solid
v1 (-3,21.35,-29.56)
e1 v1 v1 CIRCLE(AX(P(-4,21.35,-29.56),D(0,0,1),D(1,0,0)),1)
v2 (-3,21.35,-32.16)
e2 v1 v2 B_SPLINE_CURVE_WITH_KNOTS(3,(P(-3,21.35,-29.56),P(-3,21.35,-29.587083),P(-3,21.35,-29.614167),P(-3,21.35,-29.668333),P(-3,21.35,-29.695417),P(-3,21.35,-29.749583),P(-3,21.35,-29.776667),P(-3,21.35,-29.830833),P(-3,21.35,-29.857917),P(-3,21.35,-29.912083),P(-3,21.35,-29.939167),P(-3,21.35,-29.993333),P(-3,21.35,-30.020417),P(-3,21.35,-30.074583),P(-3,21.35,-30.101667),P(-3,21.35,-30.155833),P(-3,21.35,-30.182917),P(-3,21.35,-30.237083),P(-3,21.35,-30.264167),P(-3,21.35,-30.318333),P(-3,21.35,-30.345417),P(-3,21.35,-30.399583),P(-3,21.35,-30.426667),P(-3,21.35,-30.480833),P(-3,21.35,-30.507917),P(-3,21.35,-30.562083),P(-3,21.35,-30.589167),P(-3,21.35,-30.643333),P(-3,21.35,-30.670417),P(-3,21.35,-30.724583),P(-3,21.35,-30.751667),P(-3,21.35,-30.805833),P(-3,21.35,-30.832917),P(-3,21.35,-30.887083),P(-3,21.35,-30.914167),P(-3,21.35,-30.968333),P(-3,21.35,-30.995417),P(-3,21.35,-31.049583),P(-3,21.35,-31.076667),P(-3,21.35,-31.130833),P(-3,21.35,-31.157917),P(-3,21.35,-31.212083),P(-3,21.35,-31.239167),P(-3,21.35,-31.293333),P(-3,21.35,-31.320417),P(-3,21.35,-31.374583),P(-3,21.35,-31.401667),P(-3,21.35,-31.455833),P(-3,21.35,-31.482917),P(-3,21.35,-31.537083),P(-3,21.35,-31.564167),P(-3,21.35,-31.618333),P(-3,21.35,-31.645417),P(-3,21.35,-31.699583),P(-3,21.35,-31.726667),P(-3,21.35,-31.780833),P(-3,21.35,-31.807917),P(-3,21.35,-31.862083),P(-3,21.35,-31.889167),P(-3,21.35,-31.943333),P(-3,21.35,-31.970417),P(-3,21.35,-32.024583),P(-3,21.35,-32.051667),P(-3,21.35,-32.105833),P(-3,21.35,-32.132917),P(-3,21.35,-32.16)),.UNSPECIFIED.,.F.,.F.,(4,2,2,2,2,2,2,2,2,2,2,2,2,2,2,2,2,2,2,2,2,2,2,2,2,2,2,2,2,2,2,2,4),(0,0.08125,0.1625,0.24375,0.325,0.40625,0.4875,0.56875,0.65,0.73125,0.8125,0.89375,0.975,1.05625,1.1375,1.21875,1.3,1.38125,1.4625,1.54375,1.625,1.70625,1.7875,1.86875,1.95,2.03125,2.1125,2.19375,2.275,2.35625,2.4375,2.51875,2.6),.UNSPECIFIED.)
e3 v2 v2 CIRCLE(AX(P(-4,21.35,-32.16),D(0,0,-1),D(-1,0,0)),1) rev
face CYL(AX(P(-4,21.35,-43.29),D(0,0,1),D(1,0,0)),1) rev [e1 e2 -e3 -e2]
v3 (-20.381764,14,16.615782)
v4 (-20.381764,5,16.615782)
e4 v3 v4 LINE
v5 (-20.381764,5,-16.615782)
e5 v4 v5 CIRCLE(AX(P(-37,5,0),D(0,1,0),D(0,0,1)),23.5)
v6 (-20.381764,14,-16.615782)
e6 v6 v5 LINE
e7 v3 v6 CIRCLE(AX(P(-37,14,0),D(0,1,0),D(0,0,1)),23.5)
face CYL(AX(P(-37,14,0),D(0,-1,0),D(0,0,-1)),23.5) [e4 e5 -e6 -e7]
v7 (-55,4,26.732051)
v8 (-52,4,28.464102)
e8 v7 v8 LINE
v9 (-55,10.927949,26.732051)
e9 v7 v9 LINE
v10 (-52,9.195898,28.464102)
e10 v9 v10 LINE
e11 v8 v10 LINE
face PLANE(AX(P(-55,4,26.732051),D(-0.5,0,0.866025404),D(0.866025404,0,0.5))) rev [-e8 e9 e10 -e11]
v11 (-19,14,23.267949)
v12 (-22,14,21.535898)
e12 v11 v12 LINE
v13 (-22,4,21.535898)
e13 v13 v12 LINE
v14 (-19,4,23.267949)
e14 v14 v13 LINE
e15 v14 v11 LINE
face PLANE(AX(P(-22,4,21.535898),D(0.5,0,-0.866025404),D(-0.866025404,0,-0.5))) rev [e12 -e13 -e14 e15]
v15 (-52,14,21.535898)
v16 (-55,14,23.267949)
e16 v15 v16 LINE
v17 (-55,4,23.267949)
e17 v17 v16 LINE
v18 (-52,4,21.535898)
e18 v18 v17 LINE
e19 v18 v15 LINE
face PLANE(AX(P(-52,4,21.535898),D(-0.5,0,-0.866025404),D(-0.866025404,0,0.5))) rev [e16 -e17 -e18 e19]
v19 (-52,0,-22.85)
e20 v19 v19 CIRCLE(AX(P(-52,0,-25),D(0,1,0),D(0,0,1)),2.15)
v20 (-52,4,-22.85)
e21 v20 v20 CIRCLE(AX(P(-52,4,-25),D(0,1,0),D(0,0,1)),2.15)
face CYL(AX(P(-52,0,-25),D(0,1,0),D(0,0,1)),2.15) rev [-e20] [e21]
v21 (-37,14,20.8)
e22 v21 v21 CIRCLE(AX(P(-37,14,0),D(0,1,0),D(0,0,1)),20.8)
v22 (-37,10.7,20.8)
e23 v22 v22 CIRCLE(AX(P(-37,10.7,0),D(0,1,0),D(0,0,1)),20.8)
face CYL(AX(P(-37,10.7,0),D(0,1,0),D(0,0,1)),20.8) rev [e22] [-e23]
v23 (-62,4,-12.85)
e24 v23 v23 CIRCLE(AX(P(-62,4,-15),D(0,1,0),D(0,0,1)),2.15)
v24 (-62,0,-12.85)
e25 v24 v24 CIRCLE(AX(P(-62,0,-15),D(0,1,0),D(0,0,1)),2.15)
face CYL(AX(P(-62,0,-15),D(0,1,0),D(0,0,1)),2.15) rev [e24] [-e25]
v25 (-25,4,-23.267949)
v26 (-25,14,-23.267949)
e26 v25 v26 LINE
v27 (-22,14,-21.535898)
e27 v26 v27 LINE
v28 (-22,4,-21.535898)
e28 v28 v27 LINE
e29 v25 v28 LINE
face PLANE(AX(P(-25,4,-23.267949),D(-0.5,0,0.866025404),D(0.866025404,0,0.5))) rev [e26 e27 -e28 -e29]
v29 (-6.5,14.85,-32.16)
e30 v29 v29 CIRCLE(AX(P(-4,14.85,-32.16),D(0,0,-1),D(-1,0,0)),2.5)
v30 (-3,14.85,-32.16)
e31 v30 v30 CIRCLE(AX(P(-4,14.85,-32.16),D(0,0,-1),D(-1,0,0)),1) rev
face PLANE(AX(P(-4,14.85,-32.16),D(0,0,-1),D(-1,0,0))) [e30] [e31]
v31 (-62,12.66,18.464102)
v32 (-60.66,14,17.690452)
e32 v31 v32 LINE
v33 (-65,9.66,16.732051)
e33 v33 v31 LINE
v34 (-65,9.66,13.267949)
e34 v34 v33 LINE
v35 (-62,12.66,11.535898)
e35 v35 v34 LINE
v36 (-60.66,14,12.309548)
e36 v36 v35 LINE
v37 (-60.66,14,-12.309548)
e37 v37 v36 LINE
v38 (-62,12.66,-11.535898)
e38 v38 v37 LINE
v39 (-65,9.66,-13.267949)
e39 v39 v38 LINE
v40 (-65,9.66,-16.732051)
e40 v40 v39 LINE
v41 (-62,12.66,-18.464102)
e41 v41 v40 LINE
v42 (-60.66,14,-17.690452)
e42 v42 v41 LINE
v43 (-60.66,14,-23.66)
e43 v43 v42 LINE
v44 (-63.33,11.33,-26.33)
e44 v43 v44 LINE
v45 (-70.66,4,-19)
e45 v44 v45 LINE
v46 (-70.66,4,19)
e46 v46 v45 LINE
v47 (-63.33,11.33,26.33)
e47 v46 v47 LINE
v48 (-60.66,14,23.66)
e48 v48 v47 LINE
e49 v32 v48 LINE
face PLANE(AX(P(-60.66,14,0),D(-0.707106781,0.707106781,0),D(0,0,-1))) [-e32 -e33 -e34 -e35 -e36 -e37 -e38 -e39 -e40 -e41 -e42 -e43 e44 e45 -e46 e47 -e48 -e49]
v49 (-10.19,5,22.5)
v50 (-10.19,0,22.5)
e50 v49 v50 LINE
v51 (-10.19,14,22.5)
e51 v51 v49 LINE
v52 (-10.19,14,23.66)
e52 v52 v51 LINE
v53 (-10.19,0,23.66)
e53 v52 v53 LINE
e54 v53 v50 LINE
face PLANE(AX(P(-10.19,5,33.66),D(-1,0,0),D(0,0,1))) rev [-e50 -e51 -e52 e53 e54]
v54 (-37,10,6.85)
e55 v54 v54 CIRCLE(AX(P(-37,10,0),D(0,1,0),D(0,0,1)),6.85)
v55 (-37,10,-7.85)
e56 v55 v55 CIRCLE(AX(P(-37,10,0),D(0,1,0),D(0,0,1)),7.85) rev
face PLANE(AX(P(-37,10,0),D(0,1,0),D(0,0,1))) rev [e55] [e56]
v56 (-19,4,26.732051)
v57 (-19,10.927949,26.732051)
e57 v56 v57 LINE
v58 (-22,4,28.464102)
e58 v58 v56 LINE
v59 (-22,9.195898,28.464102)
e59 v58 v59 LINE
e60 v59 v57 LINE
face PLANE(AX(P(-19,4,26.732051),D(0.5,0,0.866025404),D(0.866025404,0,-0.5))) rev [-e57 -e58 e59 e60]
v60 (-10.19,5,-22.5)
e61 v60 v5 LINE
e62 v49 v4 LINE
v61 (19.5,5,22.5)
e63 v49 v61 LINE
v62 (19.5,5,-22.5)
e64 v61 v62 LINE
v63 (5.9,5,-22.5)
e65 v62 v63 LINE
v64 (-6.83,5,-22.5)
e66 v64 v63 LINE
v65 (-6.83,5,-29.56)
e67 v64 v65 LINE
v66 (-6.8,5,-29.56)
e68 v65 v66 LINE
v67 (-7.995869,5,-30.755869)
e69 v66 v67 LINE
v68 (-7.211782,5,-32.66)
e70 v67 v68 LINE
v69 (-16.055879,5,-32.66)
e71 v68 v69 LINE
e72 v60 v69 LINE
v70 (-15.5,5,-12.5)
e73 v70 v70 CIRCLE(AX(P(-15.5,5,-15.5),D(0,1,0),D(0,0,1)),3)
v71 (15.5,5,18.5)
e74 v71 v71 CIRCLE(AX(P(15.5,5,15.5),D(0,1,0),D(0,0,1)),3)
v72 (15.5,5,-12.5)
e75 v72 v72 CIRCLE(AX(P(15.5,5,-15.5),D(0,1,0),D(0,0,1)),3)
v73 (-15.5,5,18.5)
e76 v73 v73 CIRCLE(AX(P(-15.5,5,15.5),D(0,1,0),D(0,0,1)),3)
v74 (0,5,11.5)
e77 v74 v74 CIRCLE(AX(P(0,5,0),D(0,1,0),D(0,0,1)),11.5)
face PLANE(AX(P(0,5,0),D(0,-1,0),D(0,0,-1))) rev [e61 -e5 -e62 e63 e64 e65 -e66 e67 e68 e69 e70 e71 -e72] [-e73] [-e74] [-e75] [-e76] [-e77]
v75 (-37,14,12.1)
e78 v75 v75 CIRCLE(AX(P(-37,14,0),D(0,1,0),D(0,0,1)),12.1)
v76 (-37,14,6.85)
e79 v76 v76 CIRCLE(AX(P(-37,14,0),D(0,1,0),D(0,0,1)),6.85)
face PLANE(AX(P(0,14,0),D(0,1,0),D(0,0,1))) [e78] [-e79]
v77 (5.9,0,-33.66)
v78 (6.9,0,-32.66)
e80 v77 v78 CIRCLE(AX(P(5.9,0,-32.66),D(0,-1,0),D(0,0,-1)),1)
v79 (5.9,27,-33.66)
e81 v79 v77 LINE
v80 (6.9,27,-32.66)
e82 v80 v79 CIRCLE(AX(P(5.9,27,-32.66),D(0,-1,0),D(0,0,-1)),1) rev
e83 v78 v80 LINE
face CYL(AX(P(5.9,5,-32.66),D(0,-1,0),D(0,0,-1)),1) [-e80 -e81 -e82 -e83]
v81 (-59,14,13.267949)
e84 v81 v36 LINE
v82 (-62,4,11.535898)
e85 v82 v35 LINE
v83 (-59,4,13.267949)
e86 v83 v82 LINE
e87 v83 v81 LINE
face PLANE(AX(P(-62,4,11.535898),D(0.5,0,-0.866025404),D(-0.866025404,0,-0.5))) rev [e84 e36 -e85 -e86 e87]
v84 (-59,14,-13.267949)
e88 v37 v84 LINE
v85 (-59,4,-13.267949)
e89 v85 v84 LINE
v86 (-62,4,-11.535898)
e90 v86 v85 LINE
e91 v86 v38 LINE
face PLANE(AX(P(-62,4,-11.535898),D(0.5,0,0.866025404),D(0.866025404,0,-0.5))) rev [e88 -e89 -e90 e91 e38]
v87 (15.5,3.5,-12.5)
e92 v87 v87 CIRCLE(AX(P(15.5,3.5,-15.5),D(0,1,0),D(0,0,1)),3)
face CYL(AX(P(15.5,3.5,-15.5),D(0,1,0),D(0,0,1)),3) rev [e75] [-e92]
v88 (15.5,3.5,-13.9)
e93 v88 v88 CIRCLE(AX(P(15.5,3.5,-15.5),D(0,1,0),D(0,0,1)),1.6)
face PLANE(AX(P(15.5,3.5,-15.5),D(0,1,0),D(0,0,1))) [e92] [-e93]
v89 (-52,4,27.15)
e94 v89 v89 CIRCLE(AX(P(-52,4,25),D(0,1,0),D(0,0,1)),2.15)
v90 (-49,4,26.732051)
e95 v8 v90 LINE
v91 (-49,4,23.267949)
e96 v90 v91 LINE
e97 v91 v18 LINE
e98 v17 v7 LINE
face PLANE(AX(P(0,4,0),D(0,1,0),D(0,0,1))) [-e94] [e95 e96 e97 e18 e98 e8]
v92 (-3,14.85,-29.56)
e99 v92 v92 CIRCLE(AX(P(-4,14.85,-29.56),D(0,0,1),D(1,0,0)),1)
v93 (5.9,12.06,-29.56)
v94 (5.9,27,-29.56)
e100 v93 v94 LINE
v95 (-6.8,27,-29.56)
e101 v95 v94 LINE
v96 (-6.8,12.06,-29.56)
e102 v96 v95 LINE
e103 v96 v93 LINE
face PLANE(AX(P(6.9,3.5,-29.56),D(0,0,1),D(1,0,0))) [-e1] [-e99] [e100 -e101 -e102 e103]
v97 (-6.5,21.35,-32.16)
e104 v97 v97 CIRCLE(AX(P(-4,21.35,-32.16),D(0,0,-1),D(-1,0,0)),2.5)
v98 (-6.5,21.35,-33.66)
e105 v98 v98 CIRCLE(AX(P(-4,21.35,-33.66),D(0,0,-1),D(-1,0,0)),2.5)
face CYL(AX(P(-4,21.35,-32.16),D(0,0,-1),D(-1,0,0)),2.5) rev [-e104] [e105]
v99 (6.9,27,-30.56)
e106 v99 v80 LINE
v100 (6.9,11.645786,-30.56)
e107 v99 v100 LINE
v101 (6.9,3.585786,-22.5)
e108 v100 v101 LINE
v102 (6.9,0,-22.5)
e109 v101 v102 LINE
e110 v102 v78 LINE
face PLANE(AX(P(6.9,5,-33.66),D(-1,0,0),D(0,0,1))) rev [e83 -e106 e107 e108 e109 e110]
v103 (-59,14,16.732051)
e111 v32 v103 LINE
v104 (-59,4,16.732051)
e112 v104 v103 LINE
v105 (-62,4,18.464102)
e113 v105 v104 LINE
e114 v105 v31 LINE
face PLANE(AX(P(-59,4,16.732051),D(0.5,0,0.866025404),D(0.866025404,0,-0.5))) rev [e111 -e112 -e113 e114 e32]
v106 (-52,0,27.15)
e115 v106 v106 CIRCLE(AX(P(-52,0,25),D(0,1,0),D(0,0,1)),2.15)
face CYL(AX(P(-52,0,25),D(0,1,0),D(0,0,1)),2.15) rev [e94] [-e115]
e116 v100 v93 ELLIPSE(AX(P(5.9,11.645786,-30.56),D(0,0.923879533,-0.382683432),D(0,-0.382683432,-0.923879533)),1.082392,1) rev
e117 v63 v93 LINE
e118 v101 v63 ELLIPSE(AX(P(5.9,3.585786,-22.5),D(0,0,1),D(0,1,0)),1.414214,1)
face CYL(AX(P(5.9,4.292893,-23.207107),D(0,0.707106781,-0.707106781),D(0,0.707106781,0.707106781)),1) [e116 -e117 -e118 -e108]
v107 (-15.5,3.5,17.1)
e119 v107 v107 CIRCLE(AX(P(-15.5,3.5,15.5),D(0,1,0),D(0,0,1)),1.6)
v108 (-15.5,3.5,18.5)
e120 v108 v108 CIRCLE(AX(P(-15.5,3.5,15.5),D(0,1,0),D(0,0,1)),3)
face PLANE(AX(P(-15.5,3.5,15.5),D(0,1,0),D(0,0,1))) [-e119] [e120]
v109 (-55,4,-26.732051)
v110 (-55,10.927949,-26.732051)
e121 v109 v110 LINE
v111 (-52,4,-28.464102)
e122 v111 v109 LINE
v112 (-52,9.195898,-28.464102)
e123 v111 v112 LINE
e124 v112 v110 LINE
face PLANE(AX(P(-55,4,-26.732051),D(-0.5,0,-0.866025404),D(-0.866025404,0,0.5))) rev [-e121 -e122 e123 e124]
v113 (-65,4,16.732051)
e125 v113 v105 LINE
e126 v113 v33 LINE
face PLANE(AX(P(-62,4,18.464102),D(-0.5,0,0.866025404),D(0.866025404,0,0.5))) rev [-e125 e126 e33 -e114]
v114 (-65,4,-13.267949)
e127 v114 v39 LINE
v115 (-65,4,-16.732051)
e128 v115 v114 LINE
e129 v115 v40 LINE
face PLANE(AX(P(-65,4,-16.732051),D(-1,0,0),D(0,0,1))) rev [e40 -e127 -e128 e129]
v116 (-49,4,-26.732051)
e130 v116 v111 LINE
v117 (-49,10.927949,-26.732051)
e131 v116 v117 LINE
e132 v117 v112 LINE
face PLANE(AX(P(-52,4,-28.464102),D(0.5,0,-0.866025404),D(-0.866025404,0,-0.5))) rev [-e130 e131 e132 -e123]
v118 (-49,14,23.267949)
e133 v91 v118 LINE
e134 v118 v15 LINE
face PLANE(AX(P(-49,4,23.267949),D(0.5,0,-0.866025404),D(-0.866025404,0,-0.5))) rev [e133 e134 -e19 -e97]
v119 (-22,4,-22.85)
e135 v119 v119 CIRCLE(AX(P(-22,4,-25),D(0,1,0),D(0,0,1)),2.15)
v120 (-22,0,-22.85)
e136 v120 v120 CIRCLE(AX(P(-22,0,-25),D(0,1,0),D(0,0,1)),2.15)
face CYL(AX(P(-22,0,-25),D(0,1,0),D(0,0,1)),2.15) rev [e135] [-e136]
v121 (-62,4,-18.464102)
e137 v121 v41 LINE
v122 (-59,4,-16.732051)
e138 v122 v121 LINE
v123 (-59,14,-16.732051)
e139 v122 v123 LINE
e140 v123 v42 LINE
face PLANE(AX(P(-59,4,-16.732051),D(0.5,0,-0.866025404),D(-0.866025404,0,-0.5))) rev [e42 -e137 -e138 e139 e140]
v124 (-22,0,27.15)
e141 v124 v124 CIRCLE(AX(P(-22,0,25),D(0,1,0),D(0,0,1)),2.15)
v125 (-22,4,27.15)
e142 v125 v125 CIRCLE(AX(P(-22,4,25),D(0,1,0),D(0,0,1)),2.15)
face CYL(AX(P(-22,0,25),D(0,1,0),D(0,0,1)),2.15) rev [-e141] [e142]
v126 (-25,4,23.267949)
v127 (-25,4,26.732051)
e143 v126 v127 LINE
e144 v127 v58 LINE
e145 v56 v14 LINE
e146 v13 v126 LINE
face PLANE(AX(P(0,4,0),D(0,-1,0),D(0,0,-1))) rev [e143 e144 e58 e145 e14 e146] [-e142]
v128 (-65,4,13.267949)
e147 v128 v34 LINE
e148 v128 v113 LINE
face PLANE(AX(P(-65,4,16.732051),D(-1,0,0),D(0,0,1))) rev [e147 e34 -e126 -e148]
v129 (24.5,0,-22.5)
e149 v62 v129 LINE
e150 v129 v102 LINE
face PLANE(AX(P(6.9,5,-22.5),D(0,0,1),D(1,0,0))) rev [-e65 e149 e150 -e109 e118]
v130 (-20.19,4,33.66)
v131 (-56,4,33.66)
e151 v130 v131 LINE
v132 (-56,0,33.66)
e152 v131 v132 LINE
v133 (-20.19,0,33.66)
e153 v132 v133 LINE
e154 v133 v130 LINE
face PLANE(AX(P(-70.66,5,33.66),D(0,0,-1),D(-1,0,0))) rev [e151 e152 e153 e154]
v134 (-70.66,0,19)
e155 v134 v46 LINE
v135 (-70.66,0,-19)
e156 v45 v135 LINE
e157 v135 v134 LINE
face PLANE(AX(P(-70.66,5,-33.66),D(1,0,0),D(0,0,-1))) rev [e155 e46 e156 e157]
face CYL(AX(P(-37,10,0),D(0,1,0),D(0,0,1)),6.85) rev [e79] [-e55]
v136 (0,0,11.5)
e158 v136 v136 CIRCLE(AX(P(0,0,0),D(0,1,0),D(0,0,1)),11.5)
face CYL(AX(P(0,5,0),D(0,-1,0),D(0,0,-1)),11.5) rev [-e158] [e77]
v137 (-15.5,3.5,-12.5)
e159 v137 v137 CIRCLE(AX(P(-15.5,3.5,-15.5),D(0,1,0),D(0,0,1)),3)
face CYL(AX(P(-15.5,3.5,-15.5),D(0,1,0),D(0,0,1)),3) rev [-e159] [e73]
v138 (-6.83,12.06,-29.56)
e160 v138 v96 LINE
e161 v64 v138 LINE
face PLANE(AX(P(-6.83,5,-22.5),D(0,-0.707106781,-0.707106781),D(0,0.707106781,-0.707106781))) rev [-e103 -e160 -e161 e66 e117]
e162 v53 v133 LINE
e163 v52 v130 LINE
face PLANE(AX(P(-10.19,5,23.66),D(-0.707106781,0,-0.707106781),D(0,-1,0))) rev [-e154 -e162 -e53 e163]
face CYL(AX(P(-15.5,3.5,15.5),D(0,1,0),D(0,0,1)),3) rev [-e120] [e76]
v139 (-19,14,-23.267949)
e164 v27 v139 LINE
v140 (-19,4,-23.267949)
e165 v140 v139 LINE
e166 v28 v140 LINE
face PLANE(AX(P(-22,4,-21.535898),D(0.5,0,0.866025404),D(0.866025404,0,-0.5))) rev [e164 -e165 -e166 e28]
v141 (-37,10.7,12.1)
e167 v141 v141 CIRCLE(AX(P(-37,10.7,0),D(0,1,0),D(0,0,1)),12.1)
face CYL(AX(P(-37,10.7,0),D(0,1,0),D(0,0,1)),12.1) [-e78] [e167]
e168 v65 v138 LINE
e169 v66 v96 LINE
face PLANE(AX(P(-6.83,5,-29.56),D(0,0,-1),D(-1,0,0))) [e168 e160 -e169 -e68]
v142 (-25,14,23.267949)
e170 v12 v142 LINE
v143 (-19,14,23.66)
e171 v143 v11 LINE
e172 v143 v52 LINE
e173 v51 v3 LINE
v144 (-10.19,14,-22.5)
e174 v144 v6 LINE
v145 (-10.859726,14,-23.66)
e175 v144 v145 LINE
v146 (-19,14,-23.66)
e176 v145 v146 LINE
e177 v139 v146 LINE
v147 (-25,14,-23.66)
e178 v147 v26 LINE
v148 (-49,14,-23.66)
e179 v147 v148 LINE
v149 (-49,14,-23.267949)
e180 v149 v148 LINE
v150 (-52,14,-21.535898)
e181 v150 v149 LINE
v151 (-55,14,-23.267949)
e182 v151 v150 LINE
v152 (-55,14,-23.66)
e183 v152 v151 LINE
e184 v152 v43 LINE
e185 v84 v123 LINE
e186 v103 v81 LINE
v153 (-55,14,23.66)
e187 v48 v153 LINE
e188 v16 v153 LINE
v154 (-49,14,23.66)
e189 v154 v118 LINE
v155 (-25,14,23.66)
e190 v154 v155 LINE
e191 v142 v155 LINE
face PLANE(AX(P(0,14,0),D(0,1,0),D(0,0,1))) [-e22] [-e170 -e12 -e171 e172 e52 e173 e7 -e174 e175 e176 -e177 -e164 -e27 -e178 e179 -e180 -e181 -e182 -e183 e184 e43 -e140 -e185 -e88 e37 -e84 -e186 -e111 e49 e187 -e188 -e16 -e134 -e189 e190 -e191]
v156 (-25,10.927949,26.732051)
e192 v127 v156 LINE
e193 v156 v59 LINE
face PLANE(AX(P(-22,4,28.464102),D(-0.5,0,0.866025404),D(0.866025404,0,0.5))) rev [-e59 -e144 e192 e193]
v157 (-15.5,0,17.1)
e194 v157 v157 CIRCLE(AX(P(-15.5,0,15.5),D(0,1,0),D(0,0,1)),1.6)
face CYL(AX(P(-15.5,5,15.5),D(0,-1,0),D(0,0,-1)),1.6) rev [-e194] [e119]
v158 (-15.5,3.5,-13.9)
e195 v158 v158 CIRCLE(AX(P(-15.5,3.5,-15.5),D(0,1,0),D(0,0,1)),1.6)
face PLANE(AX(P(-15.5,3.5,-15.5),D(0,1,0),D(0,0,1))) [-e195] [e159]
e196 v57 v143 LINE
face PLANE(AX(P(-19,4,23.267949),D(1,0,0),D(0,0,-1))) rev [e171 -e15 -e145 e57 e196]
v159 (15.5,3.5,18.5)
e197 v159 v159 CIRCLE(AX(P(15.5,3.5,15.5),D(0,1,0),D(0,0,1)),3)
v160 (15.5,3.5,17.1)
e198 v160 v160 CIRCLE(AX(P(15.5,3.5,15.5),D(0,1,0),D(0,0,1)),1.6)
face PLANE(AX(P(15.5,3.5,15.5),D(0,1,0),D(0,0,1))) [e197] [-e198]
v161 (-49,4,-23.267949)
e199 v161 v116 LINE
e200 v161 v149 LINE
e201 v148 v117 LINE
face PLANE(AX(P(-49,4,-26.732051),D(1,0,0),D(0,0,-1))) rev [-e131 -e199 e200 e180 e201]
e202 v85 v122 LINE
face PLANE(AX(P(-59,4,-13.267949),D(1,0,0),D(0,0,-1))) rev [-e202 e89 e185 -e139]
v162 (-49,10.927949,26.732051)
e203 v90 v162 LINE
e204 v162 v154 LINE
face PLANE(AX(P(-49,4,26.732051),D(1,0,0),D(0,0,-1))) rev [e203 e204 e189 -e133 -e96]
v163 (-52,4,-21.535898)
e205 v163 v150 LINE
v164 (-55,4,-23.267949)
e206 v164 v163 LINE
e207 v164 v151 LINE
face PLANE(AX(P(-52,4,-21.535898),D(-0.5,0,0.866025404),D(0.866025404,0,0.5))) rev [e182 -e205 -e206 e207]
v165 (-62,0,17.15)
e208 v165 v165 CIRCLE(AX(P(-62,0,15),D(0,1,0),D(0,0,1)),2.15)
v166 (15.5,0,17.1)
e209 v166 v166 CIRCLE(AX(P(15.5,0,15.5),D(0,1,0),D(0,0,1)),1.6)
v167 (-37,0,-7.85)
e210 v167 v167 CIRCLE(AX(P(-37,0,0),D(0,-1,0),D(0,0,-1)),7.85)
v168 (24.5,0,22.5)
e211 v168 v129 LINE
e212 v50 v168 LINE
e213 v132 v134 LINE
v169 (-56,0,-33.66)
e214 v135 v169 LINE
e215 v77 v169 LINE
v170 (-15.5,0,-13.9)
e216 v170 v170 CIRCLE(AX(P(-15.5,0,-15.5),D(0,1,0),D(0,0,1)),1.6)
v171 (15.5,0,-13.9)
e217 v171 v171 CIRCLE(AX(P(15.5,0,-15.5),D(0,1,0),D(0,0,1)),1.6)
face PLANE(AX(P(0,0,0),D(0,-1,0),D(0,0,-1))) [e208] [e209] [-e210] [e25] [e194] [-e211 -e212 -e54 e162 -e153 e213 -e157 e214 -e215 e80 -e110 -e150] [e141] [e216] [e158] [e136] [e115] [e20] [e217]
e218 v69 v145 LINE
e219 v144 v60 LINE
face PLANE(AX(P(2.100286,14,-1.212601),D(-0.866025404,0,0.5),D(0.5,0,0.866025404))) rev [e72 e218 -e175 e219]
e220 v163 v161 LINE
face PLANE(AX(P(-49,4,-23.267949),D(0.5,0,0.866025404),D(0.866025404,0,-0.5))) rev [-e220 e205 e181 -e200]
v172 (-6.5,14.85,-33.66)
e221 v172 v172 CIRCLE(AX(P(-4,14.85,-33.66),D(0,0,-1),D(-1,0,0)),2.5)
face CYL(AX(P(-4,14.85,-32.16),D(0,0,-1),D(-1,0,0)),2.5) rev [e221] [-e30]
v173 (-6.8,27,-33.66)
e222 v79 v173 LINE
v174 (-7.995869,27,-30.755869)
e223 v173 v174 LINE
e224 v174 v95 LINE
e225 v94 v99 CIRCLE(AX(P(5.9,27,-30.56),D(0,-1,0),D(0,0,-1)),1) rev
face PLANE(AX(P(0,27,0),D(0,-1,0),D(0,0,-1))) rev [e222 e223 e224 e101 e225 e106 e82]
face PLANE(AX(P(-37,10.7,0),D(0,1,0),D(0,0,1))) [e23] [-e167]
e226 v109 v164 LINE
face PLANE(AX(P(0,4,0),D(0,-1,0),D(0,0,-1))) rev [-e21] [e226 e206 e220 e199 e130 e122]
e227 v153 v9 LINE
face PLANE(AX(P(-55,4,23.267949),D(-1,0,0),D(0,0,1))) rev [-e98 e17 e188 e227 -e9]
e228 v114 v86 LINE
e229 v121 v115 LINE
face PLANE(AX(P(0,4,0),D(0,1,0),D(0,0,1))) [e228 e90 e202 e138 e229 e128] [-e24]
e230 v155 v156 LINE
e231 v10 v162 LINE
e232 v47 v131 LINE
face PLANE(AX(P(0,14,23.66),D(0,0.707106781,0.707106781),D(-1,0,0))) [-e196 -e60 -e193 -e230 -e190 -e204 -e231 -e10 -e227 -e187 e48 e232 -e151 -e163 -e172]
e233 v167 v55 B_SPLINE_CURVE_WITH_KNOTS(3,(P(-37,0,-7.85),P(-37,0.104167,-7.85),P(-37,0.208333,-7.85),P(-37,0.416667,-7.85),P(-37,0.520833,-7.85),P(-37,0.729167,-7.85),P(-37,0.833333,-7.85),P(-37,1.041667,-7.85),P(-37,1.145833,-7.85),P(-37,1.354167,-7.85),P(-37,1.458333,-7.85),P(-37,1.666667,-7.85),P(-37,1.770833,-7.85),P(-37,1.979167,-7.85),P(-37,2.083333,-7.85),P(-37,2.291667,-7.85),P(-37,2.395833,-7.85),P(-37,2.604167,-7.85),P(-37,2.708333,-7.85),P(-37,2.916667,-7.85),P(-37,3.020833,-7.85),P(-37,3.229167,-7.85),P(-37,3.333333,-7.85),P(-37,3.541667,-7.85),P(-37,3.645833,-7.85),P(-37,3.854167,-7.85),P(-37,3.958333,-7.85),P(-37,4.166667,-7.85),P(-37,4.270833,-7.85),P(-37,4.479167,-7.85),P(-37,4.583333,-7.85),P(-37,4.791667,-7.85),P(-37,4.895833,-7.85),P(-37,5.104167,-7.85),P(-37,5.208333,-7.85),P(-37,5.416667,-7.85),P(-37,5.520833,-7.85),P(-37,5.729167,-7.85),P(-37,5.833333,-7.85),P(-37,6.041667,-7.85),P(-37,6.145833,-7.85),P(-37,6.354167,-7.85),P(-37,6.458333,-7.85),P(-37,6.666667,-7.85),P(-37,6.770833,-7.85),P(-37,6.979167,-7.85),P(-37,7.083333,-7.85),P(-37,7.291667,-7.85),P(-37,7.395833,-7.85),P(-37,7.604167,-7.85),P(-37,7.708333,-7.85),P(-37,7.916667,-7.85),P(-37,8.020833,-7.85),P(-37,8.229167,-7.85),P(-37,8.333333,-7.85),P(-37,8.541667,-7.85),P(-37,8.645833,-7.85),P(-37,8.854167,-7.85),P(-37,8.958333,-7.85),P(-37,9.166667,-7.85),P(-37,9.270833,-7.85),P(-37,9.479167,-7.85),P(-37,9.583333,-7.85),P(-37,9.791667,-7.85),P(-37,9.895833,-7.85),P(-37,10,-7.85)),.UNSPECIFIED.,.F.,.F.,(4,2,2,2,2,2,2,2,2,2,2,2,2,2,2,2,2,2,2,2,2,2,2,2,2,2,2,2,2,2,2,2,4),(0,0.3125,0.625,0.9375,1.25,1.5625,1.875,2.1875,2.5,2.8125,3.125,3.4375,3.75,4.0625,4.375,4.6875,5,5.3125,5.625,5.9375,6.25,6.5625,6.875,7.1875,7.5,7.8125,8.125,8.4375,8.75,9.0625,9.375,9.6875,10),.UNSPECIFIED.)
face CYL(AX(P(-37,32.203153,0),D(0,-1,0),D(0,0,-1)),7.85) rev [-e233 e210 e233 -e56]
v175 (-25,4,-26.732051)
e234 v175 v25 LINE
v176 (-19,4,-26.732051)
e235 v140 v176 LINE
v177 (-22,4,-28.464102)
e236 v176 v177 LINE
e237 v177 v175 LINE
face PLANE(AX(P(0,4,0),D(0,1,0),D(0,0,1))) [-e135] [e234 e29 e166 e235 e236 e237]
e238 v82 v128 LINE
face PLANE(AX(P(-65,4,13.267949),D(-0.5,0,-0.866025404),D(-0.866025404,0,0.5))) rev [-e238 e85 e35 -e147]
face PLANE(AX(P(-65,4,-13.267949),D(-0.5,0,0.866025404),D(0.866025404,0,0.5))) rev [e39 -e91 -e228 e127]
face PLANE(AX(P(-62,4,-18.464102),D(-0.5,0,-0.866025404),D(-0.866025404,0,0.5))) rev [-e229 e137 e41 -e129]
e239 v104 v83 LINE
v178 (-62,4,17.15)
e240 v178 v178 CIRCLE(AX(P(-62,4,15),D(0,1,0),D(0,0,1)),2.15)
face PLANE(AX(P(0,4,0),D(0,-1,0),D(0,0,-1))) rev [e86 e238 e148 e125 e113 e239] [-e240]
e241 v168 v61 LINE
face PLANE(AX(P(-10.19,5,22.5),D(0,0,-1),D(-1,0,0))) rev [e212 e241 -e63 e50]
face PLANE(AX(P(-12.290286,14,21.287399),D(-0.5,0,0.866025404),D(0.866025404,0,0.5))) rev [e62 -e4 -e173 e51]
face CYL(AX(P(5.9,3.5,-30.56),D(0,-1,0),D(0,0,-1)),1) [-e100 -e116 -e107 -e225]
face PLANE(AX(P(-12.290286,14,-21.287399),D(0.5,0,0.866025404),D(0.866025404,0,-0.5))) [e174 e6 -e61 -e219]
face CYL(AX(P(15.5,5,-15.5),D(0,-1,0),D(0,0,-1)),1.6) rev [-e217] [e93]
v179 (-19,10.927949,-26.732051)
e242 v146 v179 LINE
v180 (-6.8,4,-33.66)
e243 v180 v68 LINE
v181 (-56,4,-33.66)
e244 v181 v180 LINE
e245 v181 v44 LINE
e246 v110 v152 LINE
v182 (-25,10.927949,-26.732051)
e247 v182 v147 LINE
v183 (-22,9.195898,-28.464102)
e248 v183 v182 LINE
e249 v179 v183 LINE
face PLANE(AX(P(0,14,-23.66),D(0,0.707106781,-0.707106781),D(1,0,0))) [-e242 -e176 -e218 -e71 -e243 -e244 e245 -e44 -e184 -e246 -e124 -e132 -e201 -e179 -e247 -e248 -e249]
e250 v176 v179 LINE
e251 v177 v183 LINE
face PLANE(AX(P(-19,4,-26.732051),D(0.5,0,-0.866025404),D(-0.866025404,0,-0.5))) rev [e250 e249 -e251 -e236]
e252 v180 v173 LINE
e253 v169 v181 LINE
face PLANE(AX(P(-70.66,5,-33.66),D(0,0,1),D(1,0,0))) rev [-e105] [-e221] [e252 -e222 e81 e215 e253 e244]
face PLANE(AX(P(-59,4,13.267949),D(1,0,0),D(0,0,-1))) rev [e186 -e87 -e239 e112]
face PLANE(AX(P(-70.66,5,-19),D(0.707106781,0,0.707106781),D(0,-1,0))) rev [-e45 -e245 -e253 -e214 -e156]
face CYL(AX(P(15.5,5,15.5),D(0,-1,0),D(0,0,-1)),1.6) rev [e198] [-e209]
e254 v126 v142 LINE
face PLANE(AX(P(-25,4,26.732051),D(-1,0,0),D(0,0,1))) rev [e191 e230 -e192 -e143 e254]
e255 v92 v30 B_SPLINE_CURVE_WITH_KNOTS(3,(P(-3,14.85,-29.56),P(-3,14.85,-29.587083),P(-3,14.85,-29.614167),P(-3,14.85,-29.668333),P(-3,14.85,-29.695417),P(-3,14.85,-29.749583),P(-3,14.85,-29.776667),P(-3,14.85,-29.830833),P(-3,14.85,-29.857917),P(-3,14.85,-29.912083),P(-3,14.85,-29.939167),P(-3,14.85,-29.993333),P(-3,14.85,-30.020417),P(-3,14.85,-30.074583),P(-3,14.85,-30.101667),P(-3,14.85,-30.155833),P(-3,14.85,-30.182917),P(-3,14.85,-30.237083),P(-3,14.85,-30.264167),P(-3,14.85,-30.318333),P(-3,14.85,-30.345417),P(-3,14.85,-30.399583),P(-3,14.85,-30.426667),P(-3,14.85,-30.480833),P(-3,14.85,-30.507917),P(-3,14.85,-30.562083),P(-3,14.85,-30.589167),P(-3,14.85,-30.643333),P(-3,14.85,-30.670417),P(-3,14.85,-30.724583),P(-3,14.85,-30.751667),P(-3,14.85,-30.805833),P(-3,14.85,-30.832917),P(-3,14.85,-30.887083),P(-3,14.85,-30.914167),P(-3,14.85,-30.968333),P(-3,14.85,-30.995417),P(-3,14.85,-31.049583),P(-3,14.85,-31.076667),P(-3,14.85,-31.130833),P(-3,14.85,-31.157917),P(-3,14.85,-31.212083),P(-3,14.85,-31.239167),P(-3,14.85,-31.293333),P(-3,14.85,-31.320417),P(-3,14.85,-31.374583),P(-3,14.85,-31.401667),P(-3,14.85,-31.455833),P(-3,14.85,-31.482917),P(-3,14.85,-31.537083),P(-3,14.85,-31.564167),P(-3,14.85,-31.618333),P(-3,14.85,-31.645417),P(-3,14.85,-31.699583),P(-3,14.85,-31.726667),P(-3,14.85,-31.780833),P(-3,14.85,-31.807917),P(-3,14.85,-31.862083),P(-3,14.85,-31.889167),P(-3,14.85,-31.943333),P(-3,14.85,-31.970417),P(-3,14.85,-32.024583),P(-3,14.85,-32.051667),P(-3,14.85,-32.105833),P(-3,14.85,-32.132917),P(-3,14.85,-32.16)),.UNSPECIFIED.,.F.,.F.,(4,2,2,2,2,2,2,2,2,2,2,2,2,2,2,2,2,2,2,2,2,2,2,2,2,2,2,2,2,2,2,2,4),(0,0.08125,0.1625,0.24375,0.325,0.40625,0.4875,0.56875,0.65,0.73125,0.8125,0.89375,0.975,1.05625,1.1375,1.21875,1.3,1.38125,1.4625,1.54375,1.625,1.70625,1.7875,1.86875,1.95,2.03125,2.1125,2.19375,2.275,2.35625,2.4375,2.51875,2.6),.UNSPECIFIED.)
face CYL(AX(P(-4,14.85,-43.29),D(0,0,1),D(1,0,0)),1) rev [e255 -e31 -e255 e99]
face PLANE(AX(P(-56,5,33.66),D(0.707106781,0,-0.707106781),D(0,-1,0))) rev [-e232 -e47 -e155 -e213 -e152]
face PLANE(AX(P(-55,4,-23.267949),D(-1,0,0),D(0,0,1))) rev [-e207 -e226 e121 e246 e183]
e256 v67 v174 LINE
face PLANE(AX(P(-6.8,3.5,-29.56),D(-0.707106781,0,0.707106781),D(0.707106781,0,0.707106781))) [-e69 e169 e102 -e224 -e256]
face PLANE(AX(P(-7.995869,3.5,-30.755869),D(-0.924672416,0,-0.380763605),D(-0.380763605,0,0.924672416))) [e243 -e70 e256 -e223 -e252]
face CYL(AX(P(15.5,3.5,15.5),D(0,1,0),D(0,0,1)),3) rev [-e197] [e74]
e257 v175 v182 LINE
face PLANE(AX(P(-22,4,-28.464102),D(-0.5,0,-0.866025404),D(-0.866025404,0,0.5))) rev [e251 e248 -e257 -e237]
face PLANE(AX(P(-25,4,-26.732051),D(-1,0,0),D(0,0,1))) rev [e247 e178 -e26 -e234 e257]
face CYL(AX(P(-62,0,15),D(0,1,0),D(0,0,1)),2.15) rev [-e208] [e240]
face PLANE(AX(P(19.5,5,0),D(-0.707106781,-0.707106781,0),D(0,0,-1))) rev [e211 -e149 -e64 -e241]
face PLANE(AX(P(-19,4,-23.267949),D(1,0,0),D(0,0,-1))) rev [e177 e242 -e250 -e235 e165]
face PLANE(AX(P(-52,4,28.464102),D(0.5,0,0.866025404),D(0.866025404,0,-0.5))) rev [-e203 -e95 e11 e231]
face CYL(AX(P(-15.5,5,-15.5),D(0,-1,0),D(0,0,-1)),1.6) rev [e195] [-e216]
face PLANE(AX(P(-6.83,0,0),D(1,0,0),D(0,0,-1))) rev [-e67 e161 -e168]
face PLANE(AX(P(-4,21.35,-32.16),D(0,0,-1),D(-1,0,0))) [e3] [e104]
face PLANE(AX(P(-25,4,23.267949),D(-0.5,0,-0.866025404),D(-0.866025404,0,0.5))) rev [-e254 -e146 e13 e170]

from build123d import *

# Parameters (mm, degrees)
SKETCH1_R                = 11.5
SKETCH1_R_2              = 1.6
BOSS_EXTRUDE1_DEPTH      = 5
BOSS_EXTRUDE2_DEPTH      = 9
SKETCH3_R                = 20.8
SKETCH3_R_2              = 12.1
CUT_EXTRUDE1_DEPTH       = 3.3
SKETCH4_R                = 6.85
CUT_EXTRUDE2_DEPTH       = 4
SKETCH5_R                = 7.85
CUT_EXTRUDE3_DEPTH       = 10
CUT_EXTRUDE4_DEPTH       = 10
SKETCH7_R                = 2.15
CUT_EXTRUDE5_DEPTH       = 79.90393653
CHAMFER1_SIZE            = 10
CHAMFER2_SIZE            = 14.66
CHAMFER3_SIZE            = 5
SKETCH8_R                = 3
CUT_EXTRUDE6_DEPTH       = 1.5
BOSS_EXTRUDE3_DEPTH      = 22
BOSS_EXTRUDE3_DEPTH_BACK = 1.5
BOSS_EXTRUDE4_DEPTH      = 13.73
SKETCH12_R               = 1
CUT_EXTRUDE7_DEPTH       = 13.73
SKETCH13_R               = 2.5
CUT_EXTRUDE8_DEPTH       = 1.5
FILLET1_R                = 1


# Some blends are built 0.0001 mm under size
with BuildPart() as part:
    # Sketch1 → Boss-Extrude1 (new body)
    with BuildSketch(Plane(origin=(0, 0, 0), x_dir=(1, 0, 0), z_dir=(0, 1, 0))):
        Polygon((24.5, 22.5), (24.5, -22.5), (-10.19, -22.5), (-10.19, -33.66), (-70.66, -33.66), (-70.66, 33.66), (6.9, 33.66), (6.9, 22.5), align=None)
        with Locations(Location((0, 0, 0), (0, 0, 270))):
            Circle(SKETCH1_R, mode=Mode.SUBTRACT)
        with Locations(Location((15.5, 15.5, 0), (0, 0, 270))):
            Circle(SKETCH1_R_2, mode=Mode.SUBTRACT)
        with Locations(Location((15.5, -15.5, 0), (0, 0, 270))):
            Circle(SKETCH1_R_2, mode=Mode.SUBTRACT)
        with Locations(Location((-15.5, -15.5, 0), (0, 0, 270))):
            Circle(SKETCH1_R_2, mode=Mode.SUBTRACT)
        with Locations(Location((-15.5, 15.5, 0), (0, 0, 270))):
            Circle(SKETCH1_R_2, mode=Mode.SUBTRACT)
    extrude(amount=BOSS_EXTRUDE1_DEPTH)

    # Sketch2 → Boss-Extrude2 (add)
    with BuildSketch(Plane(origin=(0, 5, 0), x_dir=(1, 0, 0), z_dir=(0, 1, 0))):
        with BuildLine():
            Line((-10.19, -33.66), (-10.19, -22.5))
            Line((-10.19, -22.5), (-20.381763801, -16.615782426))
            ThreePointArc((-20.381763801, -16.615782426), (-45.992259152, -21.711500992), (-60.5, 0))
            Line((-60.5, 0), (-70.66, 0))
            Line((-70.66, 0), (-70.66, -33.66))
            Line((-70.66, -33.66), (-10.19, -33.66))
        make_face()
        with BuildLine():
            ThreePointArc((-60.5, 0), (-45.992259152, -21.711500992), (-20.381763801, -16.615782426))
            ThreePointArc((-20.381763801, -16.615782426), (-15.288499008, -8.992259152), (-13.5, 0))
            Line((-13.5, 0), (-60.5, 0))
        make_face()
        with BuildLine():
            Line((-60.5, 0), (-13.5, 0))
            ThreePointArc((-13.5, 0), (-15.288499008, 8.992259152), (-20.381763801, 16.615782426))
            ThreePointArc((-20.381763801, 16.615782426), (-45.992259152, 21.711500992), (-60.5, 0))
        make_face()
        with BuildLine():
            Line((-70.66, 0), (-60.5, 0))
            ThreePointArc((-60.5, 0), (-45.992259152, 21.711500992), (-20.381763801, 16.615782426))
            Line((-20.381763801, 16.615782426), (-10.19, 22.5))
            Line((-10.19, 22.5), (-16.633229004, 33.66))
            Line((-16.633229004, 33.66), (-70.66, 33.66))
            Line((-70.66, 33.66), (-70.66, 0))
        make_face()
    extrude(amount=BOSS_EXTRUDE2_DEPTH)

    # Sketch3 → Cut-Extrude1 (cut)
    with BuildSketch(Plane(origin=(0, 14, 0), x_dir=(1, 0, 0), z_dir=(0, 1, 0))):
        with Locations(Location((-37, 0, 0), (0, 0, 270))):
            Circle(SKETCH3_R)
        with Locations(Location((-37, 0, 0), (0, 0, 270))):
            Circle(SKETCH3_R_2, mode=Mode.SUBTRACT)
    extrude(amount=-CUT_EXTRUDE1_DEPTH, mode=Mode.SUBTRACT)

    # Sketch4 → Cut-Extrude2 (cut)
    with BuildSketch(Plane(origin=(0, 14, 0), x_dir=(1, 0, 0), z_dir=(0, 1, 0))):
        with Locations(Location((-37, 0, 0), (0, 0, 270))):
            Circle(SKETCH4_R)
    extrude(amount=-CUT_EXTRUDE2_DEPTH, mode=Mode.SUBTRACT)

    # Sketch5 → Cut-Extrude3 (cut)
    with BuildSketch(Plane.XZ):
        with Locations(Location((-37, 0, 0), (0, 0, 270))):
            Circle(SKETCH5_R)
    extrude(amount=-CUT_EXTRUDE3_DEPTH, mode=Mode.SUBTRACT)

    # Sketch6 → Cut-Extrude4 (cut)
    with BuildSketch(Plane(origin=(0, 14, 0), x_dir=(1, 0, 0), z_dir=(0, 1, 0))):
        Polygon((-55, 26.732050808), (-52, 28.464101615), (-49, 26.732050808), (-49, 23.267949192), (-52, 21.535898385), (-55, 23.267949192), align=None)
        Polygon((-22, 28.464101615), (-25, 26.732050808), (-25, 23.267949192), (-22, 21.535898385), (-19, 23.267949192), (-19, 26.732050808), align=None)
        Polygon((-52, -21.535898385), (-55, -23.267949192), (-55, -26.732050808), (-52, -28.464101615), (-49, -26.732050808), (-49, -23.267949192), align=None)
        Polygon((-19, -26.732050808), (-22, -28.464101615), (-25, -26.732050808), (-25, -23.267949192), (-22, -21.535898385), (-19, -23.267949192), align=None)
        Polygon((-65, -13.267949192), (-62, -11.535898385), (-59, -13.267949192), (-59, -16.732050808), (-62, -18.464101615), (-65, -16.732050808), align=None)
        Polygon((-62, 11.535898385), (-59, 13.267949192), (-59, 16.732050808), (-62, 18.464101615), (-65, 16.732050808), (-65, 13.267949192), align=None)
    extrude(amount=-CUT_EXTRUDE4_DEPTH, mode=Mode.SUBTRACT)

    # Sketch7 → Cut-Extrude5 (cut, through all)
    with BuildSketch(Plane(origin=(0, 4, 0), x_dir=(1, 0, 0), z_dir=(0, 1, 0))):
        with Locations(Location((-62, -15, 0), (0, 0, 270))):
            Circle(SKETCH7_R)
        with Locations(Location((-52, -25, 0), (0, 0, 270))):
            Circle(SKETCH7_R)
        with Locations(Location((-22, -25, 0), (0, 0, 270))):
            Circle(SKETCH7_R)
        with Locations(Location((-62, 15, 0), (0, 0, 270))):
            Circle(SKETCH7_R)
        with Locations(Location((-52, 25, 0), (0, 0, 270))):
            Circle(SKETCH7_R)
        with Locations(Location((-22, 25, 0), (0, 0, 270))):
            Circle(SKETCH7_R)
    extrude(amount=-CUT_EXTRUDE5_DEPTH, mode=Mode.SUBTRACT)

    # Chamfer1
    # the kernel refuses this chamfer: 10 mm, written as the material it takes off along each edge
    with BuildSketch(Plane(origin=(-10.19, 39.71682988, 33.66), x_dir=(0.027495876610586317, 0, -0.9996219169112968), z_dir=(0, -1, 0))) as chamfer1_piece_1:
        Polygon((CHAMFER1_SIZE * 0.999621916911, -CHAMFER1_SIZE * 0.0274958766106), (-CHAMFER1_SIZE * 0.0274958766106, -CHAMFER1_SIZE * 0.999621916911), (0, 0), align=None)
    extrude(amount=65.433659759, mode=Mode.SUBTRACT)
    with BuildSketch(Plane(origin=(9.083600876, 14, -33.66), x_dir=(0, -0.9996219169112968, -0.027495876610586317), z_dir=(-1, 0, 0))) as chamfer1_piece_2:
        Polygon((CHAMFER1_SIZE * 0.999621916911, CHAMFER1_SIZE * 0.0274958766106), (-CHAMFER1_SIZE * 0.0274958766106, CHAMFER1_SIZE * 0.999621916911), (0, 0), align=None)
    extrude(amount=105.460430755, mode=Mode.SUBTRACT)
    with BuildSketch(Plane(origin=(-96.37682988, 14, 33.66), x_dir=(0, -0.9996219169112968, 0.027495876610586317), z_dir=(1, 0, 0))) as chamfer1_piece_3:
        Polygon((CHAMFER1_SIZE * 0.999621916911, CHAMFER1_SIZE * 0.0274958766106), (-CHAMFER1_SIZE * 0.0274958766106, CHAMFER1_SIZE * 0.999621916911), (0, 0), align=None)
    extrude(amount=111.903659759, mode=Mode.SUBTRACT)
    with BuildSketch(Plane(origin=(-70.66, 14, -59.37682988), x_dir=(-0.027495876610586317, -0.9996219169112968, 0), z_dir=(0, 0, 1))) as chamfer1_piece_4:
        Polygon((CHAMFER1_SIZE * 0.999621916911, CHAMFER1_SIZE * 0.0274958766106), (-CHAMFER1_SIZE * 0.0274958766106, CHAMFER1_SIZE * 0.999621916911), (0, 0), align=None)
    extrude(amount=118.753659759, mode=Mode.SUBTRACT)

    # Chamfer2
    chamfer2_edges = [part.edges().sort_by_distance(p)[0] for p in [
        (-70.66, 2, 33.66),
        (-70.66, 2, -33.66),
    ]]
    chamfer(chamfer2_edges, length=CHAMFER2_SIZE)

    # Chamfer3
    chamfer3_edges = [part.edges().sort_by_distance(p)[0] for p in [
        (24.5, 5, 0),
    ]]
    chamfer(chamfer3_edges, length=CHAMFER3_SIZE - 0.0001)  # a hair under: the kernel refuses the full size

    # Sketch8 → Cut-Extrude6 (cut)
    with BuildSketch(Plane(origin=(0, 5, 0), x_dir=(1, 0, 0), z_dir=(0, 1, 0))):
        with Locations(Location((15.5, 15.5, 0), (0, 0, 270))):
            Circle(SKETCH8_R)
        with Locations(Location((-15.5, 15.5, 0), (0, 0, 270))):
            Circle(SKETCH8_R)
        with Locations(Location((-15.5, -15.5, 0), (0, 0, 270))):
            Circle(SKETCH8_R)
        with Locations(Location((15.5, -15.5, 0), (0, 0, 270))):
            Circle(SKETCH8_R)
    extrude(amount=-CUT_EXTRUDE6_DEPTH, mode=Mode.SUBTRACT)

    # Sketch9 → Boss-Extrude3 (add, two sides: drawn at the far end of the back side and taken through both)
    with BuildSketch(Plane(origin=(0, 5, 0), x_dir=(1, 0, 0), z_dir=(0, 1, 0)).offset(-BOSS_EXTRUDE3_DEPTH_BACK)):
        Polygon((6.9, 33.66), (6.9, 29.56), (-6.8, 29.56), (-7.995869238, 30.755869238), (-6.8, 33.66), align=None)
    extrude(amount=BOSS_EXTRUDE3_DEPTH + BOSS_EXTRUDE3_DEPTH_BACK)

    # Sketch10 → Boss-Extrude4 (add)
    with BuildSketch(Plane(origin=(6.9, 0, 0), x_dir=(0, 0, -1), z_dir=(1, 0, 0))):
        Polygon((22.5, 5), (29.56, 12.06), (29.56, 5), align=None)
    extrude(amount=-BOSS_EXTRUDE4_DEPTH)

    # Sketch12 → Cut-Extrude7 (cut)
    with BuildSketch(Plane.XY.offset(-29.56)):
        with Locations((-4, 21.35)):
            Circle(SKETCH12_R)
        with Locations((-4, 14.85)):
            Circle(SKETCH12_R)
    extrude(amount=-CUT_EXTRUDE7_DEPTH, mode=Mode.SUBTRACT)

    # Sketch13 → Cut-Extrude8 (cut)
    with BuildSketch(Plane(origin=(0, 0, -33.66), x_dir=(-1, 0, 0), z_dir=(0, 0, -1))):
        with Locations((4, 14.85)):
            Circle(SKETCH13_R)
        with Locations((4, 21.35)):
            Circle(SKETCH13_R)
    extrude(amount=-CUT_EXTRUDE8_DEPTH, mode=Mode.SUBTRACT)

    # Fillet1
    fillet1_edges = [part.edges().sort_by_distance(p)[0] for p in [
        (6.9, 13.5, -33.66),
        (6.9, 19.53, -29.56),
        (6.9, 8.53, -26.03),
    ]]
    fillet(fillet1_edges, radius=FILLET1_R)


solid = part.part
